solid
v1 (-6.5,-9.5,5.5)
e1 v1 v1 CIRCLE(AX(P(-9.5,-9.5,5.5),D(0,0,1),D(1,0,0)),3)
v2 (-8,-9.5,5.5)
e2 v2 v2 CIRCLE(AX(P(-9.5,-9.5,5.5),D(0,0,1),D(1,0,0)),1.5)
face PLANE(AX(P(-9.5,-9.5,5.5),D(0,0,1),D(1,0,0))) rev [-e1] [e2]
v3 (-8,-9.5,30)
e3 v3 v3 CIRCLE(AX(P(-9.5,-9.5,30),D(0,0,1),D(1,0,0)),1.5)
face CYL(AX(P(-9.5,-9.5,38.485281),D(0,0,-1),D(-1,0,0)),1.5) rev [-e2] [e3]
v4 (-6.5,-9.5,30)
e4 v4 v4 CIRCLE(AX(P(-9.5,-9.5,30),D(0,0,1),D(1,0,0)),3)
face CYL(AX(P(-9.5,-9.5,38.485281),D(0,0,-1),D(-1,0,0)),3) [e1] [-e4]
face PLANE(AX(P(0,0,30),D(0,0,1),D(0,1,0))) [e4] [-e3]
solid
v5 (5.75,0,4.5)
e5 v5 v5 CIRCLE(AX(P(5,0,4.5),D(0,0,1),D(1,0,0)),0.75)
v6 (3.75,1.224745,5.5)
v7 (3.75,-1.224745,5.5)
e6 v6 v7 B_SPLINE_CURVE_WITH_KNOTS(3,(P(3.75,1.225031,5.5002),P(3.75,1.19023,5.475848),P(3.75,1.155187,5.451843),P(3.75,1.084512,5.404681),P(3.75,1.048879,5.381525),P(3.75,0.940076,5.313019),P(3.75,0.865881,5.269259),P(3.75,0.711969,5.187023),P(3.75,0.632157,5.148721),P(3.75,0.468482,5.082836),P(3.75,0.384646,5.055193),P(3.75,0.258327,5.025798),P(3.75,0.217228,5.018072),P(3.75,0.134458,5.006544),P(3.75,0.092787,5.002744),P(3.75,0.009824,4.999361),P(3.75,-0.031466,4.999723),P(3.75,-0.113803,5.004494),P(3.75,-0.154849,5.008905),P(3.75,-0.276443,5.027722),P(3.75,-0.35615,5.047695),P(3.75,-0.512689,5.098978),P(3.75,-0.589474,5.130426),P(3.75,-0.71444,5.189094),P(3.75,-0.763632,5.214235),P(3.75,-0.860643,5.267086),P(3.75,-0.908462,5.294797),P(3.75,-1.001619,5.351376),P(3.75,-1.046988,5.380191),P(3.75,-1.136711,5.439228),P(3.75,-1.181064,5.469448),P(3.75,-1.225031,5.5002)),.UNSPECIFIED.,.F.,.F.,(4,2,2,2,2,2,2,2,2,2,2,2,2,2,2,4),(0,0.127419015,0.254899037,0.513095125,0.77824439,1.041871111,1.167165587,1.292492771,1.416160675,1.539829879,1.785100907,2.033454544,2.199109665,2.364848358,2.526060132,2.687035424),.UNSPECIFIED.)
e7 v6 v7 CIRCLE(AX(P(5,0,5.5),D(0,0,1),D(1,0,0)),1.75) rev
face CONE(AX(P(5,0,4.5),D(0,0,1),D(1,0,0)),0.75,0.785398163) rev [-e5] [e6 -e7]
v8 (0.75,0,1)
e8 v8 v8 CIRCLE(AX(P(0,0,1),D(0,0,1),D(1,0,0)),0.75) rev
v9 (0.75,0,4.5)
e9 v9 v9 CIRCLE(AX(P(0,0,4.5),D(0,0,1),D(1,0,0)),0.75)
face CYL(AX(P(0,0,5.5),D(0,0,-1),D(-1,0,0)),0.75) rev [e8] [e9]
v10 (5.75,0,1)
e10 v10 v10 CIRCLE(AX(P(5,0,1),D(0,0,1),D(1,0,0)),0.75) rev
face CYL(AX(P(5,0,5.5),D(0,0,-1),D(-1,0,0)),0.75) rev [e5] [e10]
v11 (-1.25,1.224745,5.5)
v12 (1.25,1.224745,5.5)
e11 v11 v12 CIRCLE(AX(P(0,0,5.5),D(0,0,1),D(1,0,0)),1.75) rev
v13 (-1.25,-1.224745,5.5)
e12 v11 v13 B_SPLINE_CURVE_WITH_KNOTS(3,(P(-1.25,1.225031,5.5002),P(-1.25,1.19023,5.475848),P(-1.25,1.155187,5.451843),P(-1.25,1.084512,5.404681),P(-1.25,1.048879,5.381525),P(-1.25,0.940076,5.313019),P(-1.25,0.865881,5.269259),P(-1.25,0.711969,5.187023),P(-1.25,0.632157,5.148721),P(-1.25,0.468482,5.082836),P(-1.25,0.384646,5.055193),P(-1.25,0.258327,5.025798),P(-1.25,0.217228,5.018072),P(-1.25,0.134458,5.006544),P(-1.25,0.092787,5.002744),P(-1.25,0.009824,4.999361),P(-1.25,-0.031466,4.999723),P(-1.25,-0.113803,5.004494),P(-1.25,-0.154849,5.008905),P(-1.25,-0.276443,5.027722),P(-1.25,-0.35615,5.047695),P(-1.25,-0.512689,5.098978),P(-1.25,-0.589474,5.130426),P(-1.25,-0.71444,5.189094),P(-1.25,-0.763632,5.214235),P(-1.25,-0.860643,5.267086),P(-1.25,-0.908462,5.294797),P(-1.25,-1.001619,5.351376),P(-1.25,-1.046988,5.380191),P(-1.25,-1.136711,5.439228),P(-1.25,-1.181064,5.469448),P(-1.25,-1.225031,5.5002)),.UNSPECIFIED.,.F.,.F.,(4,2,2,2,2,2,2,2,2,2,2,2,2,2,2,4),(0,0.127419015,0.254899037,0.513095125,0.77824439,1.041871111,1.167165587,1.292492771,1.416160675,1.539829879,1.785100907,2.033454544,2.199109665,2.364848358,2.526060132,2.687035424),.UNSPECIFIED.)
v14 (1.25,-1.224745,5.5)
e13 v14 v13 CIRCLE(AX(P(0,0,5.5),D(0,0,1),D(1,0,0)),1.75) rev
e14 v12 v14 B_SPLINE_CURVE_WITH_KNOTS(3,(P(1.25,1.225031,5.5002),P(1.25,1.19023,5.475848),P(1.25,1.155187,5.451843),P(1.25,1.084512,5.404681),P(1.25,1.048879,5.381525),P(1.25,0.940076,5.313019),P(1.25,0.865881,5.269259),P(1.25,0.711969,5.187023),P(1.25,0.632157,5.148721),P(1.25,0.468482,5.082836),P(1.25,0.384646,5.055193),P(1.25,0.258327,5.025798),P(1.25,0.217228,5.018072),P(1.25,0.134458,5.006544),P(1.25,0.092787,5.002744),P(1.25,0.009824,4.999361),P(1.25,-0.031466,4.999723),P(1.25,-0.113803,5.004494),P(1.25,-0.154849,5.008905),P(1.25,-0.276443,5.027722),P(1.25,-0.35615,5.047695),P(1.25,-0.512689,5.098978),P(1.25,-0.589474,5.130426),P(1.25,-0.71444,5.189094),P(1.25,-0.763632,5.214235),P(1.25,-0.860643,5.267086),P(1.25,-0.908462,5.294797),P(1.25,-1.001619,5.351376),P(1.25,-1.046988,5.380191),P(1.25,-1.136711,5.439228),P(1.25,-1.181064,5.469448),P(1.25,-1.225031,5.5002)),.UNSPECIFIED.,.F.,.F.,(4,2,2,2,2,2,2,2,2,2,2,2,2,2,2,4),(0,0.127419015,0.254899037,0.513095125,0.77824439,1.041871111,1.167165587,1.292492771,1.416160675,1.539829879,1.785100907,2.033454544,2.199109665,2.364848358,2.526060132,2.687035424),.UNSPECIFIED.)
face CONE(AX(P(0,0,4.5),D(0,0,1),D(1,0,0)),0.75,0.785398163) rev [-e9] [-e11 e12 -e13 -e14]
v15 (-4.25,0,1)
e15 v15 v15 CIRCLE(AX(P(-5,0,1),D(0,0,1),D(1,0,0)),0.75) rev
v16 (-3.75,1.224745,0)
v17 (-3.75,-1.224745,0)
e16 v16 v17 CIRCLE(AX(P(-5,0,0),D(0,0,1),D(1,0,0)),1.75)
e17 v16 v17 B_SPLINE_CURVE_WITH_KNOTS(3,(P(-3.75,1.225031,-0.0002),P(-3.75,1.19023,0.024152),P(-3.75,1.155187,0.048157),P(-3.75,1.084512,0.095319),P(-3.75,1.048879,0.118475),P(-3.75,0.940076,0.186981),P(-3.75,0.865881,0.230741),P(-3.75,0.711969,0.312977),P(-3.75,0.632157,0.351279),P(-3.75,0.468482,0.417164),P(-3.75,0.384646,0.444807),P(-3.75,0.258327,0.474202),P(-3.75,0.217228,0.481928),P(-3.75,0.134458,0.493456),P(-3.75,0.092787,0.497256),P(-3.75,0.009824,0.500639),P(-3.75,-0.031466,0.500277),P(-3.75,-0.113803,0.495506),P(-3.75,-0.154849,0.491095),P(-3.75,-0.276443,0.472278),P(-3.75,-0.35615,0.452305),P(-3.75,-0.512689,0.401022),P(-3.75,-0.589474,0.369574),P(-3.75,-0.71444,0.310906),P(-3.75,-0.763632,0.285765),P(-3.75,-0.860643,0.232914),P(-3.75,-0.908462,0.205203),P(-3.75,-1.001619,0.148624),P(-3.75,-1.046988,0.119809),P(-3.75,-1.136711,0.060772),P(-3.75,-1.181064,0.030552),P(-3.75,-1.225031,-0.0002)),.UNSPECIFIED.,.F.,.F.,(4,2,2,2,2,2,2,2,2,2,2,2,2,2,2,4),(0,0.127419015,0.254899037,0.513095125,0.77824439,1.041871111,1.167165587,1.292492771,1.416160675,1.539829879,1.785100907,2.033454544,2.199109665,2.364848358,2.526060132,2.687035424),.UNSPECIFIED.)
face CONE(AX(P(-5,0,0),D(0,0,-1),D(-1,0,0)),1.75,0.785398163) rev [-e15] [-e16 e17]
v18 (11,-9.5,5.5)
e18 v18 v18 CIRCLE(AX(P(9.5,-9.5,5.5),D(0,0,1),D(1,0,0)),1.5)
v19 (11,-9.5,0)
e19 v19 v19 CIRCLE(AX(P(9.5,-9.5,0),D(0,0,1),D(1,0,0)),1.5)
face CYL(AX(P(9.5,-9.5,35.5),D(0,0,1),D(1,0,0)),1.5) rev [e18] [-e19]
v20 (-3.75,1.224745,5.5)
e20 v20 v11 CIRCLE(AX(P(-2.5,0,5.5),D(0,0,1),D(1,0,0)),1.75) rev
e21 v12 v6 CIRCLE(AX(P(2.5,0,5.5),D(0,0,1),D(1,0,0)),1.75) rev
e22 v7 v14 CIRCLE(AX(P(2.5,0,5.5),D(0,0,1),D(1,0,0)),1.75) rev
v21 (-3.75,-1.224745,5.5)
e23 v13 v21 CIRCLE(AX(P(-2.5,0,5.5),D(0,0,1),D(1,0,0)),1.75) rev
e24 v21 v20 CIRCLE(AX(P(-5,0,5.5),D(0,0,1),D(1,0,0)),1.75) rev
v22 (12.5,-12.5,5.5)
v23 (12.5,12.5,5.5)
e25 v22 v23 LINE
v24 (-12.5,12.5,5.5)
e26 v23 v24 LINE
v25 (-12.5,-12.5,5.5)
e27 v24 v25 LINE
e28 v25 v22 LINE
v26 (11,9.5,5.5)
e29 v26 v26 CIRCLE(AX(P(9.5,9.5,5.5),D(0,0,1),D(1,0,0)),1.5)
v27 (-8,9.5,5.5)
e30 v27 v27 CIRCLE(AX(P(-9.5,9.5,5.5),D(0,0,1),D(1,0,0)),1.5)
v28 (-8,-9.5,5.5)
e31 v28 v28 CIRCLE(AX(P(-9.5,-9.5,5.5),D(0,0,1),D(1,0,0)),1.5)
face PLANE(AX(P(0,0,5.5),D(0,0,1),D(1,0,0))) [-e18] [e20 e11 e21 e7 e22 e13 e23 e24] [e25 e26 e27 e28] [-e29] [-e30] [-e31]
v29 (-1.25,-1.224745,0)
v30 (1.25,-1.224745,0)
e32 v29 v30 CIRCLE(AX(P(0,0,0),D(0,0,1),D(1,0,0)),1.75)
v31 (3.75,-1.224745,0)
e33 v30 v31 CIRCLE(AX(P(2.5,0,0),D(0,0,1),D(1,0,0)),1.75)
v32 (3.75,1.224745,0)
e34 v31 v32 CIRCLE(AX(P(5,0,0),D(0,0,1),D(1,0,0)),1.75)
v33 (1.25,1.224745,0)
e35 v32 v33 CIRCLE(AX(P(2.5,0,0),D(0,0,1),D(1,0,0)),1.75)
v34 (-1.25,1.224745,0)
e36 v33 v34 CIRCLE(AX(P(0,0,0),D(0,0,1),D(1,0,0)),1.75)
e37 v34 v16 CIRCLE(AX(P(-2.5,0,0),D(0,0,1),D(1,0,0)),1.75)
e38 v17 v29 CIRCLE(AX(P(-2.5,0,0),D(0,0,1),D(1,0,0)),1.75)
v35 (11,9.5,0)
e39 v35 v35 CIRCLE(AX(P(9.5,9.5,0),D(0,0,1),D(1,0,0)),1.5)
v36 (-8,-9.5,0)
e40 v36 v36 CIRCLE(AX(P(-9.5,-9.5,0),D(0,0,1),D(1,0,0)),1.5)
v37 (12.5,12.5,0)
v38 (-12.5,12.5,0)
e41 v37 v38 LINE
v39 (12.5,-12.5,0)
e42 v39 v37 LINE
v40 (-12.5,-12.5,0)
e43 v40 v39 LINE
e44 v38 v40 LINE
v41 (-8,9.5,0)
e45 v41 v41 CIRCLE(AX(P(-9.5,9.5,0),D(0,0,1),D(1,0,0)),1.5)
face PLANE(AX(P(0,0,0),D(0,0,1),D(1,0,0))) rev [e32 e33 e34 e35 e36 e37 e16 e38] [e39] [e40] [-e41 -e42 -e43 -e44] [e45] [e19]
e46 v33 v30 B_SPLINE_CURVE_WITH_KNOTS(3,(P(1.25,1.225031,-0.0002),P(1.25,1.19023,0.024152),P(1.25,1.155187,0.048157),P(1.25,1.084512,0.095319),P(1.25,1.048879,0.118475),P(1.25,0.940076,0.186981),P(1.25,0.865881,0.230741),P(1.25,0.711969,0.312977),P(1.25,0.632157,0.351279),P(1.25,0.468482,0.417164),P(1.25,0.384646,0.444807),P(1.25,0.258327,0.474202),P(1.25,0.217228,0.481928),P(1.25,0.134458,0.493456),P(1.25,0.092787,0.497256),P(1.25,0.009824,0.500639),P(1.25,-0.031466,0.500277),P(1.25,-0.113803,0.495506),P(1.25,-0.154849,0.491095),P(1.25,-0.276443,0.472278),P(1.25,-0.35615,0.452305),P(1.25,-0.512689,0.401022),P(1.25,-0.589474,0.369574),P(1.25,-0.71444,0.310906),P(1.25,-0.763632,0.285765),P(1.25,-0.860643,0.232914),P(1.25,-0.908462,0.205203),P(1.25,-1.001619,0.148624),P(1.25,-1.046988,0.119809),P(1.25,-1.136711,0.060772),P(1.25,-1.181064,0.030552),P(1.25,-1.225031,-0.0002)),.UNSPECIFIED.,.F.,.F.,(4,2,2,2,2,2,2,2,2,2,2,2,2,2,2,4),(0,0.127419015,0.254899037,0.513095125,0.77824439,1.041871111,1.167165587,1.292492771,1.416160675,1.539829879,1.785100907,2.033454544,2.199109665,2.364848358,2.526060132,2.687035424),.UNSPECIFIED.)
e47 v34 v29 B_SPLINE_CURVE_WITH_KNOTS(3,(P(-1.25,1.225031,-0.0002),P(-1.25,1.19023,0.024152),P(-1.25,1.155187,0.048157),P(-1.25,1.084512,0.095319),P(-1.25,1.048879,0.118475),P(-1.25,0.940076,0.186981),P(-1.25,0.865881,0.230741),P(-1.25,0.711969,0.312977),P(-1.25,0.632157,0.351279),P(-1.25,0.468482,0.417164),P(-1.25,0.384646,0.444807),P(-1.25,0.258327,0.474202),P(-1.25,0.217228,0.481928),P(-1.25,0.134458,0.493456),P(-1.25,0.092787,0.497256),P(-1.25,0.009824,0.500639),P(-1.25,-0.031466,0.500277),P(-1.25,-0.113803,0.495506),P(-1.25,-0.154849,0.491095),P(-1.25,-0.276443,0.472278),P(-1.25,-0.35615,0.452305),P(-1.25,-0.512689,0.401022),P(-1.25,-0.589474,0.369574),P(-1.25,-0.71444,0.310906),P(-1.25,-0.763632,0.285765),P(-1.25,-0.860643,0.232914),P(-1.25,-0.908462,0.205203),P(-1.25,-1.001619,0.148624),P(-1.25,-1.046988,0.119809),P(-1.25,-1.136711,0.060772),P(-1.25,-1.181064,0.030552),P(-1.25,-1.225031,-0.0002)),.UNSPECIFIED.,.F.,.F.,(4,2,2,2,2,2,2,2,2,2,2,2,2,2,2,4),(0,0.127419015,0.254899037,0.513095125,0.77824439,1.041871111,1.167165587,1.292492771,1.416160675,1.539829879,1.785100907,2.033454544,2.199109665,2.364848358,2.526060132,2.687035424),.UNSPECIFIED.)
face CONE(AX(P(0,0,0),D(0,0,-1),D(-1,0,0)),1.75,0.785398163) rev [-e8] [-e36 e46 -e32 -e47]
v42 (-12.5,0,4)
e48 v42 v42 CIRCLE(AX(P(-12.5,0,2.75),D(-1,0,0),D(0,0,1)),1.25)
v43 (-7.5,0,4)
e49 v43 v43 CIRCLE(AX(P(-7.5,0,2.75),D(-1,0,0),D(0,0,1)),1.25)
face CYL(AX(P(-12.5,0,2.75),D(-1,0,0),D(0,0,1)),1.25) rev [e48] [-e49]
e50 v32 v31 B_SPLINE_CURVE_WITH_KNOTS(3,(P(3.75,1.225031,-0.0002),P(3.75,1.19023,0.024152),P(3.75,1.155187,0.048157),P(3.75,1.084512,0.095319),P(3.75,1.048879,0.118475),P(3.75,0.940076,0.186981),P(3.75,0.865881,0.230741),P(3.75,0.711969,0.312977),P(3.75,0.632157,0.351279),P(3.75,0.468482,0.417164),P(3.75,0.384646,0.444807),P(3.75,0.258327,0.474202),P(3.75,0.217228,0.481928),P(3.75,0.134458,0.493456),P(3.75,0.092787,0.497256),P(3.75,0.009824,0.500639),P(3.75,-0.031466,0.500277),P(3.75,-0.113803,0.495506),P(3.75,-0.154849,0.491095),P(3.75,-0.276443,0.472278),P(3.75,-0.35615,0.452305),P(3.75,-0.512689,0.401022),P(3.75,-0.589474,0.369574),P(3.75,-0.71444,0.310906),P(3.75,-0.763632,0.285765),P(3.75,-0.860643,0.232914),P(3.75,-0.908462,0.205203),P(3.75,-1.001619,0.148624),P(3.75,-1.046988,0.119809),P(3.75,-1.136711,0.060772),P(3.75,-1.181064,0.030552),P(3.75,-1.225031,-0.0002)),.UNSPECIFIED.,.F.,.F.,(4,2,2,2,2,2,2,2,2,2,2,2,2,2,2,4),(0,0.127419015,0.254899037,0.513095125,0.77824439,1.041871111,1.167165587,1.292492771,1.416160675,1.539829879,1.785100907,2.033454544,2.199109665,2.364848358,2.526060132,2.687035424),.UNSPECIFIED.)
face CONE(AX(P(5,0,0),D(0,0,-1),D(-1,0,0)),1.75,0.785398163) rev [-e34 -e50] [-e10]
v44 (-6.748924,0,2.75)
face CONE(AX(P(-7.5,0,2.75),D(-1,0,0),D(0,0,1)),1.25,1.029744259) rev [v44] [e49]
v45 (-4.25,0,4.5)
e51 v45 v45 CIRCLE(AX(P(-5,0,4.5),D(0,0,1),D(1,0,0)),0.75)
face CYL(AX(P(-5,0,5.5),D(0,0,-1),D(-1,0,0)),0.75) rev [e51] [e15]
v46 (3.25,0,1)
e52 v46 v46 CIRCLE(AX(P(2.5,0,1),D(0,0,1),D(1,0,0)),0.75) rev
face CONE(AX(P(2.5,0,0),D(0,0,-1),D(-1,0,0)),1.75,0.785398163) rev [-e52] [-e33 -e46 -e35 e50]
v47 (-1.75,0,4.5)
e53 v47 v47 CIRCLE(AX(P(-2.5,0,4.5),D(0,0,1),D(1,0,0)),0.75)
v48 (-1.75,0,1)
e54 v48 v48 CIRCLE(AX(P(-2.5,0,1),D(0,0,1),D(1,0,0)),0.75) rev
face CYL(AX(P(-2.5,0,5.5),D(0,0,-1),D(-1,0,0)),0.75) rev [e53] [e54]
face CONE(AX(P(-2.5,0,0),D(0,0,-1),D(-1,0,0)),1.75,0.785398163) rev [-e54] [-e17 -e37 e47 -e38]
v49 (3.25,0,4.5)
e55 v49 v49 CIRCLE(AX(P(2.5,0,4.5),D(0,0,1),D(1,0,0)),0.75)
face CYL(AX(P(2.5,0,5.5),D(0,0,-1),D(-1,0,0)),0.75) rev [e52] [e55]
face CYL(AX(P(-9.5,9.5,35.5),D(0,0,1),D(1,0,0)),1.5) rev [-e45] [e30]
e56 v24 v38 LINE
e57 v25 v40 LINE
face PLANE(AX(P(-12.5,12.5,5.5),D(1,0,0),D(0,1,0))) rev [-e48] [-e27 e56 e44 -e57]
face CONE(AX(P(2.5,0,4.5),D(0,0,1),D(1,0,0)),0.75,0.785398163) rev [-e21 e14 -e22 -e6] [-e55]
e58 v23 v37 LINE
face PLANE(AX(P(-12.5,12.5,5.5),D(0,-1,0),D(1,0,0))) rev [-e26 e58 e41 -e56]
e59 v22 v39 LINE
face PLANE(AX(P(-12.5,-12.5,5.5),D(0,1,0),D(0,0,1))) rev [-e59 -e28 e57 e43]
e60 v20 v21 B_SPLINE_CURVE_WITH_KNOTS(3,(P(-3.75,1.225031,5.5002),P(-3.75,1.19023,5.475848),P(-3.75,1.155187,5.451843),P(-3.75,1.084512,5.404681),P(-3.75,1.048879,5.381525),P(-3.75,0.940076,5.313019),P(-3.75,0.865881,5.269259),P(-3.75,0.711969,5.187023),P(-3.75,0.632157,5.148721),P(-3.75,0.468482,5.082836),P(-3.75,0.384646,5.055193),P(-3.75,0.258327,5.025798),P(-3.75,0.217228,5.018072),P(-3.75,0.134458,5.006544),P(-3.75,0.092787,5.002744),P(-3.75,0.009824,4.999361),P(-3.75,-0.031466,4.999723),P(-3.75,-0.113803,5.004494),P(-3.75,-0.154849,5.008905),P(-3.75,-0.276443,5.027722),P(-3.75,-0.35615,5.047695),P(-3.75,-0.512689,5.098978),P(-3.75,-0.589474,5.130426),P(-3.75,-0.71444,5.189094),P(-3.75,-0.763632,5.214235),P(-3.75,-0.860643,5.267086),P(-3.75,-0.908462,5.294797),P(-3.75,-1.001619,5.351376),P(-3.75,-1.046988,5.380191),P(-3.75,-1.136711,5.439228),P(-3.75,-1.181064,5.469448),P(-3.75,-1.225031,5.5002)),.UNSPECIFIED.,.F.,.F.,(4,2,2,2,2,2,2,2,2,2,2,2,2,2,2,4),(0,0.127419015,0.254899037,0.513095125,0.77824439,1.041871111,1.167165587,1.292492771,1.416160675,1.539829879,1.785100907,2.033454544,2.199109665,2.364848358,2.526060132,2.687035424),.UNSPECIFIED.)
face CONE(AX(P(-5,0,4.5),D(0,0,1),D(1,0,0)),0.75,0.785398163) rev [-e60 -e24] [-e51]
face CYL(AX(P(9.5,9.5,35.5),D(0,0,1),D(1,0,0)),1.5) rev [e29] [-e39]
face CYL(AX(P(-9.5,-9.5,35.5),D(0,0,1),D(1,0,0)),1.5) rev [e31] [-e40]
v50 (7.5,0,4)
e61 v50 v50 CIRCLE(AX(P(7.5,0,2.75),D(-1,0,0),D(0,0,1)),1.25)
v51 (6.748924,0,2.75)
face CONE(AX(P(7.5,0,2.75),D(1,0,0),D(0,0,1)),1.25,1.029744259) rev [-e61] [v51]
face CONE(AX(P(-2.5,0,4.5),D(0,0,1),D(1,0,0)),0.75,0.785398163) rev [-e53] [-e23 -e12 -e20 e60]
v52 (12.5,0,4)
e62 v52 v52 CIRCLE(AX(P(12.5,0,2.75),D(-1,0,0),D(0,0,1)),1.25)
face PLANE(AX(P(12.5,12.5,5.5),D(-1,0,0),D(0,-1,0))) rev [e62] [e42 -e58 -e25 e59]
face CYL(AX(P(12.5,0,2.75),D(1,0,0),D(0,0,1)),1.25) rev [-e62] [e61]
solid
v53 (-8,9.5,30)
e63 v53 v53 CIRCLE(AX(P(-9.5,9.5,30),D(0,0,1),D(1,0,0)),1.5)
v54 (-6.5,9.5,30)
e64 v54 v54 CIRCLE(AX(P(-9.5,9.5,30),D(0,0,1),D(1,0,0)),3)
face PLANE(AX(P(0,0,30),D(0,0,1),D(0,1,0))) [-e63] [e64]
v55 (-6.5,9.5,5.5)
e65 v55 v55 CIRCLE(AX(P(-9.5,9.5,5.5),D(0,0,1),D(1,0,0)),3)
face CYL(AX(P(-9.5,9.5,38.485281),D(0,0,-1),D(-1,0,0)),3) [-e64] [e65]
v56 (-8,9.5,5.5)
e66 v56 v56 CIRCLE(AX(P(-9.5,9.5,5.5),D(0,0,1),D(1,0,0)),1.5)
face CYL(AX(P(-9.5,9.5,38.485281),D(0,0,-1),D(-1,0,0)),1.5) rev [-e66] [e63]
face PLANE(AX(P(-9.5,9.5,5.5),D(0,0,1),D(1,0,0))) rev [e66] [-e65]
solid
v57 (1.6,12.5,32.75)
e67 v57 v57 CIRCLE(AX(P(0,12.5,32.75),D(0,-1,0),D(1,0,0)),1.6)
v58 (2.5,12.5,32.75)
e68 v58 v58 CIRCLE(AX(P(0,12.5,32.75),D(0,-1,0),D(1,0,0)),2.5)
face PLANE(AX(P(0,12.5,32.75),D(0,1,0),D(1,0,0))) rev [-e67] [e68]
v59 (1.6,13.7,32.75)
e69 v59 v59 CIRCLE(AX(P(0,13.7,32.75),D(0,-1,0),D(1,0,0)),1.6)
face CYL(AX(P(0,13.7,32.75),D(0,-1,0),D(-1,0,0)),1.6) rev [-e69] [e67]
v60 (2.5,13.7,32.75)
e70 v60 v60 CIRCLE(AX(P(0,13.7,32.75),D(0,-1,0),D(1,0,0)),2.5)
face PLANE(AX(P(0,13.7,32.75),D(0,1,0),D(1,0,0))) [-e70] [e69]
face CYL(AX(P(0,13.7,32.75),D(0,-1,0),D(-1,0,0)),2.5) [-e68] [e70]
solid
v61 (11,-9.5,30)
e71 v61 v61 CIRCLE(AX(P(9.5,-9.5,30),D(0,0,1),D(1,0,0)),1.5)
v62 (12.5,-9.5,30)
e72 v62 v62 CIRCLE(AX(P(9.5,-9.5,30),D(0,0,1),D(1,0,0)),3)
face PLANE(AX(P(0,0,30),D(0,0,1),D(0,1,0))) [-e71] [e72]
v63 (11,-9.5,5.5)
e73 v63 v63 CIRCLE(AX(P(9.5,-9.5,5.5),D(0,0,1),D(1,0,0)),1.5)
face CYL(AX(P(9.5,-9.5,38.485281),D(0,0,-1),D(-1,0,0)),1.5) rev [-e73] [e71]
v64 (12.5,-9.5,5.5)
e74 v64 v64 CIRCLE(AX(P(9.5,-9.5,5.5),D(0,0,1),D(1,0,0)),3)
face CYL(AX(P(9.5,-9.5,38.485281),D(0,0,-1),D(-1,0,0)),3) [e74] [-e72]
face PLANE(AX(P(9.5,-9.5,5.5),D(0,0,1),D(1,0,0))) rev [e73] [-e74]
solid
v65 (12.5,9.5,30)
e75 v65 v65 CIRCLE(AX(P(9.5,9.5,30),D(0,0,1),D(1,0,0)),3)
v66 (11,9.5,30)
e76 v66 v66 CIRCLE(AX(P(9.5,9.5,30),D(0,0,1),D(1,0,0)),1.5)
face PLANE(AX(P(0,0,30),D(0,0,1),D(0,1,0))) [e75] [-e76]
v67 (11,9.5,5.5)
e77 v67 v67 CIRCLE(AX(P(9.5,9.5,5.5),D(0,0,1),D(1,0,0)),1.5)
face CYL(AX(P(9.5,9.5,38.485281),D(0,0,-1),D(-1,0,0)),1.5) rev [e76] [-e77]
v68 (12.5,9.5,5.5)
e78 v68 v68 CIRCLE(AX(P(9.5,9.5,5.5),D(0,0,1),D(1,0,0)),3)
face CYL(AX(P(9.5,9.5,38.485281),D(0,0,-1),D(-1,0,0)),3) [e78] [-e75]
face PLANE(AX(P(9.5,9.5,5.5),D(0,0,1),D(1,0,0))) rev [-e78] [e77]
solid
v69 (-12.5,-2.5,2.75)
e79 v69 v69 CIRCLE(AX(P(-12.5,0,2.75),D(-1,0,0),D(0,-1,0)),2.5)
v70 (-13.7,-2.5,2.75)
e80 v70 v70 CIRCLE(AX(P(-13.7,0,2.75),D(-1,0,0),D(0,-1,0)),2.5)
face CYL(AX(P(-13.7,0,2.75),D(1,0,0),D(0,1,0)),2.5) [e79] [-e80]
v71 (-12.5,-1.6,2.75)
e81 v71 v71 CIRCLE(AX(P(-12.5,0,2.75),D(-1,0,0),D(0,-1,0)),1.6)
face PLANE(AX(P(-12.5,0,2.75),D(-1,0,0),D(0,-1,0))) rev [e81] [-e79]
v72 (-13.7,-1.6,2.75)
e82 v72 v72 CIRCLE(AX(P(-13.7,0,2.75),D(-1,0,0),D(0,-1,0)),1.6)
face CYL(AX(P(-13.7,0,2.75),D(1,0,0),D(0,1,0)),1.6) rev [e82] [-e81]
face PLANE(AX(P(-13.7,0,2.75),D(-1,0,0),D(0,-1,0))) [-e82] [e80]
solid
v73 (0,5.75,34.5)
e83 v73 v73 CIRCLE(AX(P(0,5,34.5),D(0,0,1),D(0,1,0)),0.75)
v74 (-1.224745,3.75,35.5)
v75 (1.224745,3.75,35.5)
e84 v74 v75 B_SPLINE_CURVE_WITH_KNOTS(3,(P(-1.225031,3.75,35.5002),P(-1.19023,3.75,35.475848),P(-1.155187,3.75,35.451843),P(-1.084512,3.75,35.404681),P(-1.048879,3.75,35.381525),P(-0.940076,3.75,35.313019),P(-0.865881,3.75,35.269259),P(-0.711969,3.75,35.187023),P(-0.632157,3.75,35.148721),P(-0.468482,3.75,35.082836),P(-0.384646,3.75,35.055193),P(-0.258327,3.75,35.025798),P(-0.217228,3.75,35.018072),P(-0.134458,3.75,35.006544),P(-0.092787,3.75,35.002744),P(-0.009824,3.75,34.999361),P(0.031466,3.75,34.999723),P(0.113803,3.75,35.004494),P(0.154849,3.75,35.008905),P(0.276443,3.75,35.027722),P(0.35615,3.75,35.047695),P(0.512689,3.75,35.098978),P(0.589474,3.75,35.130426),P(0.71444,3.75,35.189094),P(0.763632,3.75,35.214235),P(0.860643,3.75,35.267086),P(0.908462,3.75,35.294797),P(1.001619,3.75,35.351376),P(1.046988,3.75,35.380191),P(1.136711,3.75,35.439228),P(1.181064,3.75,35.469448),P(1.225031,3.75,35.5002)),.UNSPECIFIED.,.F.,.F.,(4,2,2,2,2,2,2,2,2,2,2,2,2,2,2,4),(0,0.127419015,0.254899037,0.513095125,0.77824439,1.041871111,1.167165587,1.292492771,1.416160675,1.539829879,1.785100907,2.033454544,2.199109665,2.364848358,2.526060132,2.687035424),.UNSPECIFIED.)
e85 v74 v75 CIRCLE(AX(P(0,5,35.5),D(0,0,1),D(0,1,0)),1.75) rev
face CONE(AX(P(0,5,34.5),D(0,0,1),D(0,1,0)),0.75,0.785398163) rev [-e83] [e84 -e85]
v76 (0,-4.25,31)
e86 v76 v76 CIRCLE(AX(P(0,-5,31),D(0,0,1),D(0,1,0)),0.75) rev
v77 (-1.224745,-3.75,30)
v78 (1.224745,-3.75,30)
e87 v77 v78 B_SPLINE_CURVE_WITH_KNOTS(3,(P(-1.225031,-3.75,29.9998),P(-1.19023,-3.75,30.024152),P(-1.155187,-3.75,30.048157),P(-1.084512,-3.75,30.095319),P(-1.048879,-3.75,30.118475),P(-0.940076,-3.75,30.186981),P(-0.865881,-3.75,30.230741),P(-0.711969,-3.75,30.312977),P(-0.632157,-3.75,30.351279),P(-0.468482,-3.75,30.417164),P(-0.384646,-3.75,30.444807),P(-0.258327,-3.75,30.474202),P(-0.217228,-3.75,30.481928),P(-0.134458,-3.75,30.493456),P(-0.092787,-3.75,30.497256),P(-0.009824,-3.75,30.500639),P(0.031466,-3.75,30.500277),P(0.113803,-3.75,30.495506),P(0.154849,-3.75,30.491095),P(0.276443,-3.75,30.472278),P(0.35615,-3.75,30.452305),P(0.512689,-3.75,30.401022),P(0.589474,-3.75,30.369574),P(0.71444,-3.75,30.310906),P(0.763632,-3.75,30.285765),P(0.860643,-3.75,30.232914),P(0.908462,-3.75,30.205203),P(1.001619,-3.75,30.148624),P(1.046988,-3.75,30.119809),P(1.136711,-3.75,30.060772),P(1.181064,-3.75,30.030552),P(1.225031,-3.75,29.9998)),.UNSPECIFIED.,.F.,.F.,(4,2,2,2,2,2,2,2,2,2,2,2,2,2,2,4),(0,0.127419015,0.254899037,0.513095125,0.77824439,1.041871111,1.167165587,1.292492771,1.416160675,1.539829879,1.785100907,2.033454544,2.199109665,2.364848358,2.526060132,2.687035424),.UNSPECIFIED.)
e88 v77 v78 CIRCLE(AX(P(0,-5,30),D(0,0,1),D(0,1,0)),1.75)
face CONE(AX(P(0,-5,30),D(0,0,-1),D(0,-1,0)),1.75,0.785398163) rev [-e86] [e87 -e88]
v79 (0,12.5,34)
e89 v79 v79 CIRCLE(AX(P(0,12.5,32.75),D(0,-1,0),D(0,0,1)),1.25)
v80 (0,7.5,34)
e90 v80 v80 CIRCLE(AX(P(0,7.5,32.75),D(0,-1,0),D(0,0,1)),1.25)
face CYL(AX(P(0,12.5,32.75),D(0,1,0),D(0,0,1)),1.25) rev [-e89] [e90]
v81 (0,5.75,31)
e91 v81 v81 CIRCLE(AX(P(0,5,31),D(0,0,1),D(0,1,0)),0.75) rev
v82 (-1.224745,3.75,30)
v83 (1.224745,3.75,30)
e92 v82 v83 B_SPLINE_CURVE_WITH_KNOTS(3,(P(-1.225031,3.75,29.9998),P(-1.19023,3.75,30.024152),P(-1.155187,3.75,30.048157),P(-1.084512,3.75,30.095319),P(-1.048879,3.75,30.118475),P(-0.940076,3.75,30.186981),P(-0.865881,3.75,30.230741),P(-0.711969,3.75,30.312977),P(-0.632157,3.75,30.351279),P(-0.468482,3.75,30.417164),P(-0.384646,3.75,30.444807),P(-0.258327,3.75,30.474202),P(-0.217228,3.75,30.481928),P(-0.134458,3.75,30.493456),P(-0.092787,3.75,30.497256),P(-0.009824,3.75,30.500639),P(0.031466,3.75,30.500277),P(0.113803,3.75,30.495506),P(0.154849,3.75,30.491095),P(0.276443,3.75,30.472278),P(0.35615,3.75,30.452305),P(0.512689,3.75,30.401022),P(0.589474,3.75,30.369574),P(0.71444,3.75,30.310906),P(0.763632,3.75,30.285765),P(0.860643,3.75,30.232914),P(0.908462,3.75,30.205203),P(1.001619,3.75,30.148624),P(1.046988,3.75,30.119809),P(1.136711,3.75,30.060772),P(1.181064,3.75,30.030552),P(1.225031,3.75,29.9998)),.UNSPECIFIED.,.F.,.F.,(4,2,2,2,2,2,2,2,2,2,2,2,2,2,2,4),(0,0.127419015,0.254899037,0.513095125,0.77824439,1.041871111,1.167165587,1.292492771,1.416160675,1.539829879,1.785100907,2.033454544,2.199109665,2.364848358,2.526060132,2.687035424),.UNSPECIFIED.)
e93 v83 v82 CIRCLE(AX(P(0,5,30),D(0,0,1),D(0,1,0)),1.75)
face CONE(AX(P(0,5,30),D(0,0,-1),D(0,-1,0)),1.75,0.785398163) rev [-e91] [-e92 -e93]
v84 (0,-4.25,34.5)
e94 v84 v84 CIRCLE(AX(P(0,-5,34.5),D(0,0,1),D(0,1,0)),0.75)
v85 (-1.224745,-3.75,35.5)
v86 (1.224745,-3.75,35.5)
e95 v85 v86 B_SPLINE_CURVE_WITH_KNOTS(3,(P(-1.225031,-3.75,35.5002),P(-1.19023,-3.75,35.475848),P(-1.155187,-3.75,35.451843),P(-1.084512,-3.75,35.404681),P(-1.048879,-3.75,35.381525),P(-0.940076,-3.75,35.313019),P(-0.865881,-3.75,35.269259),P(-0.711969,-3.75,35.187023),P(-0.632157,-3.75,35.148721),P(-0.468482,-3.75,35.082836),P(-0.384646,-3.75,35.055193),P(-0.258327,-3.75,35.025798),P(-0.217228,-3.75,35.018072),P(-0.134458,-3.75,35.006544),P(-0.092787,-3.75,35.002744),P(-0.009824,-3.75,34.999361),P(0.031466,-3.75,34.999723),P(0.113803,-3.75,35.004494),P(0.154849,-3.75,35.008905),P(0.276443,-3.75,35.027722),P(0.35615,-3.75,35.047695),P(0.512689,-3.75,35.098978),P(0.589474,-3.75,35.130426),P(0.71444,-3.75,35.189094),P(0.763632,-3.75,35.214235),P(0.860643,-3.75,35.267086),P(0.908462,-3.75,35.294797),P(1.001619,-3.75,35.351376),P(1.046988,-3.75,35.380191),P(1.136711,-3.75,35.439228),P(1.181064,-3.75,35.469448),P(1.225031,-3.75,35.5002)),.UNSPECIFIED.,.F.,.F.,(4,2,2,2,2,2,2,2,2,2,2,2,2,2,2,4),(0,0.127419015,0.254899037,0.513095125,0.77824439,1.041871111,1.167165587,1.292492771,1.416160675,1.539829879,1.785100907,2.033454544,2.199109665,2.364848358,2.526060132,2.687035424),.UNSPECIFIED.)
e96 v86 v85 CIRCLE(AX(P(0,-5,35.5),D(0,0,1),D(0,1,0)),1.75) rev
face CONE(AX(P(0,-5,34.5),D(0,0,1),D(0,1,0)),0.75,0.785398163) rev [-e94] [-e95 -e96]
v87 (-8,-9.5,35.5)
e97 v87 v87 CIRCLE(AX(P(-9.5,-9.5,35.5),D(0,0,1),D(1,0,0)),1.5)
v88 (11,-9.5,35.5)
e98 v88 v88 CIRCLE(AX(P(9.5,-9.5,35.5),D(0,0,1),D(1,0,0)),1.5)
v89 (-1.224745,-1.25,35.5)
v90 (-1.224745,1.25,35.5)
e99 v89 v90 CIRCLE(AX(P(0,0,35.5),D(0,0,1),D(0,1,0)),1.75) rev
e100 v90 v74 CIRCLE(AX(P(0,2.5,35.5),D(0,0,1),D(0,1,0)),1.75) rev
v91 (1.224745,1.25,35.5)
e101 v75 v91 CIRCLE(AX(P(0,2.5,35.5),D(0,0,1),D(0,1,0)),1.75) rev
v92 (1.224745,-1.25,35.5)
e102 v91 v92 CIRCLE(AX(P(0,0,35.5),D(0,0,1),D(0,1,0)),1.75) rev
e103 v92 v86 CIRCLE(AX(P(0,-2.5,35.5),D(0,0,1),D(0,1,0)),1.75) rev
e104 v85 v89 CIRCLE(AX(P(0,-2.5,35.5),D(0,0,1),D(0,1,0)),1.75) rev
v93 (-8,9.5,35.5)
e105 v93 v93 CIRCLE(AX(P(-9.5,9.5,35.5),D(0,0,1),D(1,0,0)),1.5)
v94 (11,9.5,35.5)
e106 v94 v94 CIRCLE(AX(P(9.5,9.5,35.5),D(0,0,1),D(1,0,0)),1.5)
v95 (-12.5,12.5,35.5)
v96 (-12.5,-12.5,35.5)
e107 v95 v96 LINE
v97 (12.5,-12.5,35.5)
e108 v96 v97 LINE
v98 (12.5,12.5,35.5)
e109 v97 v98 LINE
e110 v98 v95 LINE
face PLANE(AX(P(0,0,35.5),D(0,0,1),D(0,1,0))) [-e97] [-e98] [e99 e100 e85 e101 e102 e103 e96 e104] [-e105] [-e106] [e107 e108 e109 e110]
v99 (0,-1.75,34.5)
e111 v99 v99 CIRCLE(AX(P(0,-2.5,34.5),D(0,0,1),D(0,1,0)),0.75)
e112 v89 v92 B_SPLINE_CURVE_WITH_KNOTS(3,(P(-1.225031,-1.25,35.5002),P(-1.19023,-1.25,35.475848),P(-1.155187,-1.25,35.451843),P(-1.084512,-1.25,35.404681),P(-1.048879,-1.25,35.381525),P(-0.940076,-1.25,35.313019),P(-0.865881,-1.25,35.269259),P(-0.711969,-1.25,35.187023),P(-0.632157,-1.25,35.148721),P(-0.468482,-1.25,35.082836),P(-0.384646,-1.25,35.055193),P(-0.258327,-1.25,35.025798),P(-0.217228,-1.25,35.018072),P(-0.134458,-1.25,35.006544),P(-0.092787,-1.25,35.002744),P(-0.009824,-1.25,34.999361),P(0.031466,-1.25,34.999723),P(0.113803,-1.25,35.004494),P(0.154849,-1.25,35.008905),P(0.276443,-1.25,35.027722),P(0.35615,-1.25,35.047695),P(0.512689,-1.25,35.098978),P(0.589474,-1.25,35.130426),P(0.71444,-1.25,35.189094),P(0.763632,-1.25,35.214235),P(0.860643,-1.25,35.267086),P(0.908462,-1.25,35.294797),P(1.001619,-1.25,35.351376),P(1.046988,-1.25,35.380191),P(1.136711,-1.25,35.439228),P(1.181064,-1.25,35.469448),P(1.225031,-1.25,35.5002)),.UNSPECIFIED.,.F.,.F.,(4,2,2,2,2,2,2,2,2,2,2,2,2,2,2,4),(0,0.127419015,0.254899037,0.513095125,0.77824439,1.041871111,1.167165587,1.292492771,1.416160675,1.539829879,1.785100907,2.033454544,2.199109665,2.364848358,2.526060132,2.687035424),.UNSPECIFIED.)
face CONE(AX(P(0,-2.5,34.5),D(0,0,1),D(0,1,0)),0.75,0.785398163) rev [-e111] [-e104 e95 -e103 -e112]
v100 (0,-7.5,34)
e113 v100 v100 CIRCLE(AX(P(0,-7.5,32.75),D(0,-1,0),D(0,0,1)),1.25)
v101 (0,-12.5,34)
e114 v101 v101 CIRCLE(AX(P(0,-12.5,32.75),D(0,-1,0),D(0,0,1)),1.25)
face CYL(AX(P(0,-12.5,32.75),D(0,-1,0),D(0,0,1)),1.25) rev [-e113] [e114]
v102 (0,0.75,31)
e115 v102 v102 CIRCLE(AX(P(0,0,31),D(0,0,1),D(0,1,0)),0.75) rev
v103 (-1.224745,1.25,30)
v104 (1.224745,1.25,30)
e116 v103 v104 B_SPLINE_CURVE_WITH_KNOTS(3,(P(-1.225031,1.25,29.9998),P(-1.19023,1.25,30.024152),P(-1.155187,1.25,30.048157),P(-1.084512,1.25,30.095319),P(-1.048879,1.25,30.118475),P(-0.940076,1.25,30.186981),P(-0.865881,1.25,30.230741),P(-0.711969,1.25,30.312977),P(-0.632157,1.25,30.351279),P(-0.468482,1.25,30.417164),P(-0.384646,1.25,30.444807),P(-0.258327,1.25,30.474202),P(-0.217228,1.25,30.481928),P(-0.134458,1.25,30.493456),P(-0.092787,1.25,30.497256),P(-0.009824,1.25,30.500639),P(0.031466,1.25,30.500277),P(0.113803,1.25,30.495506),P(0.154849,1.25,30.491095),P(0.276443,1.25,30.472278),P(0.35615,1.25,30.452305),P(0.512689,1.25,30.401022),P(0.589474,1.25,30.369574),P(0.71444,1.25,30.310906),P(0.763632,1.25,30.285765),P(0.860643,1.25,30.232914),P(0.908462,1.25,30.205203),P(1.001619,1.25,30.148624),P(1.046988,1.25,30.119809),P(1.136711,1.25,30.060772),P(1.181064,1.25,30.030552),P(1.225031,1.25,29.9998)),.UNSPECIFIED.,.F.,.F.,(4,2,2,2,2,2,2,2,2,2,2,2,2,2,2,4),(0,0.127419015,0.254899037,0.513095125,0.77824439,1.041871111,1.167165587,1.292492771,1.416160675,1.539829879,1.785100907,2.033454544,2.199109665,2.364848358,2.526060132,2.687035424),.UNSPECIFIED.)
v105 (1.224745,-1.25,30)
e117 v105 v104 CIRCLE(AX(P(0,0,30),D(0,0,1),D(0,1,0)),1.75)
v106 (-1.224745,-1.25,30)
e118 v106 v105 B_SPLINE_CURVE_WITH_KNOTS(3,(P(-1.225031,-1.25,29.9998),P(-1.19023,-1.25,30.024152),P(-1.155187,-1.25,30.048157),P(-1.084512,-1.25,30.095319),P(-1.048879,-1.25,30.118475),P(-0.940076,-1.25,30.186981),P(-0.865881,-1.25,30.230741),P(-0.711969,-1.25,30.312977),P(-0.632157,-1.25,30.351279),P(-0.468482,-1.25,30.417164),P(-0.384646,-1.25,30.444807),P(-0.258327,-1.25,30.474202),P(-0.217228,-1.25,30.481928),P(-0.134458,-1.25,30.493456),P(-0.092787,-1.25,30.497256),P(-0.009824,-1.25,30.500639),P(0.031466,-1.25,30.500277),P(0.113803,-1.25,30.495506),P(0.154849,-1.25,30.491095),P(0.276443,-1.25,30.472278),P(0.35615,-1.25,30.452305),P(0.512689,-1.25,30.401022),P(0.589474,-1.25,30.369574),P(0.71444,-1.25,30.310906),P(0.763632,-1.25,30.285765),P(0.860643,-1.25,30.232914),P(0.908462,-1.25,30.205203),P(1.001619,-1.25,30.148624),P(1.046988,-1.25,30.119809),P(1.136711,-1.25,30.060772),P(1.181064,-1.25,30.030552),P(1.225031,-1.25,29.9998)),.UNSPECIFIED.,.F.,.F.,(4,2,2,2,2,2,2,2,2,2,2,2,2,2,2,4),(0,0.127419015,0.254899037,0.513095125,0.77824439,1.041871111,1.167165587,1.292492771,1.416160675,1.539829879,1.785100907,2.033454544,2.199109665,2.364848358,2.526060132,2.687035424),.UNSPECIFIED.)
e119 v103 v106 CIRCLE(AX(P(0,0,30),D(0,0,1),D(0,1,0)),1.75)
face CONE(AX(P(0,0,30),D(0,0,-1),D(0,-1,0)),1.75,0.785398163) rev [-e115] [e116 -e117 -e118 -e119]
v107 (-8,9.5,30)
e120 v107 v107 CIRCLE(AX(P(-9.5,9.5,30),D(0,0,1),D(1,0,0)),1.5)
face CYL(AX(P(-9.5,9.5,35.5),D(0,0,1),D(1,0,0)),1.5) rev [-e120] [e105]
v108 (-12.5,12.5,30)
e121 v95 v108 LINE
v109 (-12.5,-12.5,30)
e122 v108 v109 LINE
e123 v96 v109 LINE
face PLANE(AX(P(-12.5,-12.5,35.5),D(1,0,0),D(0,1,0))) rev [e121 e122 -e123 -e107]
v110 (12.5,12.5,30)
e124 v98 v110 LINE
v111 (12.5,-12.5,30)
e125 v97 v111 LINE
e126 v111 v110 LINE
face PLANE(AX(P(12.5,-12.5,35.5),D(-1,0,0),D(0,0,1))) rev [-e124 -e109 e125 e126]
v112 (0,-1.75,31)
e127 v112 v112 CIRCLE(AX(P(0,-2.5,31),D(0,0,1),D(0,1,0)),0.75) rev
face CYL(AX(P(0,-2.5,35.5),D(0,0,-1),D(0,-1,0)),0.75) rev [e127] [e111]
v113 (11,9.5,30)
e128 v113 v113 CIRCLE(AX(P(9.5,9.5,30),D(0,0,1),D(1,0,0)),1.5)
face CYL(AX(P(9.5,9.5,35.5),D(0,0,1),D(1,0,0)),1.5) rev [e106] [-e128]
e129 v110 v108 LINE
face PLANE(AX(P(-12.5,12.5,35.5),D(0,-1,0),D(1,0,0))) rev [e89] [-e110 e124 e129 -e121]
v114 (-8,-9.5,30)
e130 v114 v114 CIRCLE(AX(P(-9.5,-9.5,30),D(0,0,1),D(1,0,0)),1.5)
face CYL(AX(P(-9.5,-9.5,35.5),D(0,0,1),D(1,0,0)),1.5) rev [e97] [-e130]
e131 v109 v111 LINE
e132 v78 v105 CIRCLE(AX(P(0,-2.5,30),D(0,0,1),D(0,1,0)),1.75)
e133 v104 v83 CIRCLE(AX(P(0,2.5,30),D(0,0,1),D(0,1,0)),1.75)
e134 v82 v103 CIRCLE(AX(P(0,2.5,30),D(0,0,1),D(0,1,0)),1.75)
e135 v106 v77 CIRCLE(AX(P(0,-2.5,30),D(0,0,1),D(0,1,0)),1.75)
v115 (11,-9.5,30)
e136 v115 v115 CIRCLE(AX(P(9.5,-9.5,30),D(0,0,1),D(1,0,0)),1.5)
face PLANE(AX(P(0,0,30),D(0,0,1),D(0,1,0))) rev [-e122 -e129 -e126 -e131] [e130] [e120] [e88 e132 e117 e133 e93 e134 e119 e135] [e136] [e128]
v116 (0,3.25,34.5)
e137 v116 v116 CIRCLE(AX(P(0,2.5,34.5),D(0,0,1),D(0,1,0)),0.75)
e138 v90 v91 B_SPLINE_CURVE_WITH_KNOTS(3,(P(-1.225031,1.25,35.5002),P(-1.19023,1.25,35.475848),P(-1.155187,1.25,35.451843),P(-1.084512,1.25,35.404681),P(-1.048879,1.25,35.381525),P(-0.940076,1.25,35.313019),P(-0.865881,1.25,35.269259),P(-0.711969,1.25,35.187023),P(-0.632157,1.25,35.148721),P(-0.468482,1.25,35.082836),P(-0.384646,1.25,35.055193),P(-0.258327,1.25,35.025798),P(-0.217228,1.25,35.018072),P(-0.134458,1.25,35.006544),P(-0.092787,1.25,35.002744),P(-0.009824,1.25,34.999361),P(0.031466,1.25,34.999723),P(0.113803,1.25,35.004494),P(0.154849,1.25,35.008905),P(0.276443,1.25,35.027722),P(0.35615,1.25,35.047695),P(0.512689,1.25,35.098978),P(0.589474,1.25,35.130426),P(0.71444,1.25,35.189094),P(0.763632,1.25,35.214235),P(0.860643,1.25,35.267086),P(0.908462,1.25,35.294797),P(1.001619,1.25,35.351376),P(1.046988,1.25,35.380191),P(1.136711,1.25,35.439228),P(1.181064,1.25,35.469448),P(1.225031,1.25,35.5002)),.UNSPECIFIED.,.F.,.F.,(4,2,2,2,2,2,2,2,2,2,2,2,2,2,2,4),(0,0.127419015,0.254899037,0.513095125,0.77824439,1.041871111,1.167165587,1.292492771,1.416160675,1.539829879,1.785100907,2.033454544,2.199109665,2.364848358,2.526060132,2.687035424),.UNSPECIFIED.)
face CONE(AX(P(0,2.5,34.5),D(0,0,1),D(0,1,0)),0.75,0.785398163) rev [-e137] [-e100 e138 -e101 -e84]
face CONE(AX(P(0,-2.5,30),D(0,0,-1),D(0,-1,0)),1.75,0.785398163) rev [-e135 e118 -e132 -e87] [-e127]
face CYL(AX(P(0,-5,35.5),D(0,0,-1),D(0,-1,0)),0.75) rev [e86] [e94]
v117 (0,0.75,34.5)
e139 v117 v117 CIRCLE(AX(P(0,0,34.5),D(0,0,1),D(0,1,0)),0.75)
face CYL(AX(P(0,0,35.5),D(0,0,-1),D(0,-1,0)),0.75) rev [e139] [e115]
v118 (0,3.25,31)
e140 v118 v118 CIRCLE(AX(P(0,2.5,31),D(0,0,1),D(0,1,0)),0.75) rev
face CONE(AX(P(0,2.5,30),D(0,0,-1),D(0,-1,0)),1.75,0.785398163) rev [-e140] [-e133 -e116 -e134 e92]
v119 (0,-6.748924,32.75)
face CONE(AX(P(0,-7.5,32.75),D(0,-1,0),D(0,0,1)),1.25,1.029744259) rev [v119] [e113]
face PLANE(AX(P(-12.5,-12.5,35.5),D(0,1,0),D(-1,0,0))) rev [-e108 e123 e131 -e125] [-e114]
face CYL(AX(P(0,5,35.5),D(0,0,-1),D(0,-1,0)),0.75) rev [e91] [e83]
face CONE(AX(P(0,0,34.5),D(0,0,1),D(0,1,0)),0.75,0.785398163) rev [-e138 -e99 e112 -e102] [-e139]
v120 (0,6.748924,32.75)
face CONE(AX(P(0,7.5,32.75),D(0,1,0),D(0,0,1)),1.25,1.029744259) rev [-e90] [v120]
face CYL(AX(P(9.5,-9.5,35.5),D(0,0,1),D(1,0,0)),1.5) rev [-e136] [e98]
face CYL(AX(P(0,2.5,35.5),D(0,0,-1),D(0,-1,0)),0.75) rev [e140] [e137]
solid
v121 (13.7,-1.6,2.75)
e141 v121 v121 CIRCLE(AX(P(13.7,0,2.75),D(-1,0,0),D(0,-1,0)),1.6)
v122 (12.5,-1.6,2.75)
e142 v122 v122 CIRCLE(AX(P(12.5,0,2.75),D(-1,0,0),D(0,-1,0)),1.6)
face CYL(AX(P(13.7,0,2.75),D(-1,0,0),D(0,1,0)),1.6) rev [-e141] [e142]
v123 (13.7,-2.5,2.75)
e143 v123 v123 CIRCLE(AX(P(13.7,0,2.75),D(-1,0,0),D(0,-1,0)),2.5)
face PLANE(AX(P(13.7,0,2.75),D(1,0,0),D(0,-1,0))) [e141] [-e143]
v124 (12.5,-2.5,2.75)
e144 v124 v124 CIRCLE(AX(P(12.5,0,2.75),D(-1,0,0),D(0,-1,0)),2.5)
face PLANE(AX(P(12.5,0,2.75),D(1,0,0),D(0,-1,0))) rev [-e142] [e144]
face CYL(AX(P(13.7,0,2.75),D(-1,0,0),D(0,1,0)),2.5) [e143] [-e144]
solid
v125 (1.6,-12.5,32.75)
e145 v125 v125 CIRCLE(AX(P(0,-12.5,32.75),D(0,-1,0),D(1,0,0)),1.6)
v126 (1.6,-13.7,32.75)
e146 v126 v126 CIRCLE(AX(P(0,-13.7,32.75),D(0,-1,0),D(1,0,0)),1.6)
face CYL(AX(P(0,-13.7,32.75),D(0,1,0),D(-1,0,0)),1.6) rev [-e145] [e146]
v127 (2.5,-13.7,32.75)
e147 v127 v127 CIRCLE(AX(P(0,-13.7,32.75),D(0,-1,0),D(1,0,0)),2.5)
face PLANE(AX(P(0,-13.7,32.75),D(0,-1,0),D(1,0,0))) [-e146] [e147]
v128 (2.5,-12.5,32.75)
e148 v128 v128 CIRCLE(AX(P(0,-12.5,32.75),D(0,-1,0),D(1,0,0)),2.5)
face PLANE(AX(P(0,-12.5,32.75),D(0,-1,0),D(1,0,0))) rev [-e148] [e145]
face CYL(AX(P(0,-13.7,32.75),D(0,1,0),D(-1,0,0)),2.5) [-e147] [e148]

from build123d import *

# Parameters (mm, degrees)
SKETCH_1_W                  = 25
SKETCH_1_H                  = 25
SKETCH_1_R                  = 0.75
EXTRUDE_1_DEPTH             = 5.5
SKETCH_17_R                 = 2.5
SKETCH_17_R_2               = 1.6
EXTRUDE_3_DEPTH             = 1.2
CHAMFER_1_SIZE              = 1
PATTERN_LINEAR_1_COUNT      = 2
PATTERN_LINEAR_1_PITCH      = 30
MOVE_BODY_1_ANGLE           = 90
SKETCH_3_W                  = 1.5
SKETCH_3_H                  = 35.742873133
HOLE_WIZARD_M3_1_AT_2_COUNT = 2
HOLE_WIZARD_M3_1_AT_2_PITCH = 19
HOLE_WIZARD_M3_1_AT_3_COUNT = 2
HOLE_WIZARD_M3_1_AT_3_PITCH = 26.870057685
HOLE_WIZARD_M3_1_AT_4_COUNT = 2
HOLE_WIZARD_M3_1_AT_4_PITCH = 19
SKETCH_4_R                  = 3
SKETCH_4_R_2                = 1.5
EXTRUDE_2_DEPTH             = 24.5
EXTRUDE_2_2_DEPTH           = 24.5
EXTRUDE_2_3_DEPTH           = 24.5
EXTRUDE_2_4_DEPTH           = 24.5


with BuildPart() as part:
    # ｽｹｯﾁ1 → ﾎﾞｽ - 押し出し1 (new body)
    with BuildSketch(Plane.XY):
        Rectangle(SKETCH_1_W, SKETCH_1_H)
        Circle(SKETCH_1_R, mode=Mode.SUBTRACT)
        with Locations((2.5, 0)):
            Circle(SKETCH_1_R, mode=Mode.SUBTRACT)
        with Locations((5, 0)):
            Circle(SKETCH_1_R, mode=Mode.SUBTRACT)
        with Locations(Location((-5, 0, 0), (0, 0, 180))):
            Circle(SKETCH_1_R, mode=Mode.SUBTRACT)
        with Locations(Location((-2.5, 0, 0), (0, 0, 180))):
            Circle(SKETCH_1_R, mode=Mode.SUBTRACT)
    extrude(amount=EXTRUDE_1_DEPTH)

    # ｽｹｯﾁ16 → M3x0.5 ねじ穴1 (revolve, cut)
    with BuildSketch(Plane(origin=(-12.5, 0, 2.75), x_dir=(0, 0, 1), z_dir=(0, 1, 0))):
        Polygon((0, 0), (0, 5.751075774), (1.25, 5), (1.25, 0), align=None)
    m3x0_5_1 = revolve(axis=Axis((-18.85, 0, 2.75), (1, 0, 0)), mode=Mode.SUBTRACT)

    # 面取り1
    # the kernel refuses this chamfer: 1 mm, written as the material it takes off along each edge
    with BuildSketch(Plane(origin=(0, 0, 0), x_dir=(1, 0, 0), z_dir=(0, -1, 0))) as chamfer_1_piece_1:
        Polygon((0.75 + CHAMFER_1_SIZE, 0), (0.75, CHAMFER_1_SIZE), (0.75, 0), align=None)
    revolve(axis=Axis((0, 0, 0), (0, 0, 1)), mode=Mode.SUBTRACT)
    with BuildSketch(Plane(origin=(0, 0, 5.5), x_dir=(1, 0, 0), z_dir=(0, -1, 0))) as chamfer_1_piece_2:
        Polygon((0.75 + CHAMFER_1_SIZE, 0), (0.75, -CHAMFER_1_SIZE), (0.75, 0), align=None)
    revolve(axis=Axis((0, 0, 5.5), (0, 0, 1)), mode=Mode.SUBTRACT)
    with BuildSketch(Plane(origin=(2.5, 0, 0), x_dir=(1, 0, 0), z_dir=(0, -1, 0))) as chamfer_1_piece_3:
        Polygon((0.75 + CHAMFER_1_SIZE, 0), (0.75, CHAMFER_1_SIZE), (0.75, 0), align=None)
    revolve(axis=Axis((2.5, 0, 0), (0, 0, 1)), mode=Mode.SUBTRACT)
    with BuildSketch(Plane(origin=(2.5, 0, 5.5), x_dir=(1, 0, 0), z_dir=(0, -1, 0))) as chamfer_1_piece_4:
        Polygon((0.75 + CHAMFER_1_SIZE, 0), (0.75, -CHAMFER_1_SIZE), (0.75, 0), align=None)
    revolve(axis=Axis((2.5, 0, 5.5), (0, 0, 1)), mode=Mode.SUBTRACT)
    with BuildSketch(Plane(origin=(5, 0, 0), x_dir=(1, 0, 0), z_dir=(0, -1, 0))) as chamfer_1_piece_5:
        Polygon((0.75 + CHAMFER_1_SIZE, 0), (0.75, CHAMFER_1_SIZE), (0.75, 0), align=None)
    revolve(axis=Axis((5, 0, 0), (0, 0, 1)), mode=Mode.SUBTRACT)
    with BuildSketch(Plane(origin=(5, 0, 5.5), x_dir=(1, 0, 0), z_dir=(0, -1, 0))) as chamfer_1_piece_6:
        Polygon((0.75 + CHAMFER_1_SIZE, 0), (0.75, -CHAMFER_1_SIZE), (0.75, 0), align=None)
    revolve(axis=Axis((5, 0, 5.5), (0, 0, 1)), mode=Mode.SUBTRACT)
    with BuildSketch(Plane(origin=(-5, 0, 0), x_dir=(-1, 0, 0), z_dir=(0, 1, 0))) as chamfer_1_piece_7:
        Polygon((0.75 + CHAMFER_1_SIZE, 0), (0.75, CHAMFER_1_SIZE), (0.75, 0), align=None)
    revolve(axis=Axis((-5, 0, 0), (0, 0, 1)), mode=Mode.SUBTRACT)
    with BuildSketch(Plane(origin=(-5, 0, 5.5), x_dir=(-1, 0, 0), z_dir=(0, 1, 0))) as chamfer_1_piece_8:
        Polygon((0.75 + CHAMFER_1_SIZE, 0), (0.75, -CHAMFER_1_SIZE), (0.75, 0), align=None)
    revolve(axis=Axis((-5, 0, 5.5), (0, 0, 1)), mode=Mode.SUBTRACT)
    with BuildSketch(Plane(origin=(-2.5, 0, 0), x_dir=(-1, 0, 0), z_dir=(0, 1, 0))) as chamfer_1_piece_9:
        Polygon((0.75 + CHAMFER_1_SIZE, 0), (0.75, CHAMFER_1_SIZE), (0.75, 0), align=None)
    revolve(axis=Axis((-2.5, 0, 0), (0, 0, 1)), mode=Mode.SUBTRACT)
    with BuildSketch(Plane(origin=(-2.5, 0, 5.5), x_dir=(-1, 0, 0), z_dir=(0, 1, 0))) as chamfer_1_piece_10:
        Polygon((0.75 + CHAMFER_1_SIZE, 0), (0.75, -CHAMFER_1_SIZE), (0.75, 0), align=None)
    revolve(axis=Axis((-2.5, 0, 5.5), (0, 0, 1)), mode=Mode.SUBTRACT)

    # ﾐﾗｰ1: M3x0.5 ねじ穴1 across plane
    add(m3x0_5_1.mirror(Plane(origin=(0, 0, 0), x_dir=(0, 0, 1), z_dir=(1, 0, 0))), mode=Mode.SUBTRACT)


with BuildPart() as body_2:
    # ｽｹｯﾁ17 → ﾎﾞｽ - 押し出し3 (new body)
    with BuildSketch(Plane.ZY.offset(12.5)):
        with Locations(Location((2.75, 0, 0), (0, 0, 270))):
            Circle(SKETCH_17_R)
        with Locations(Location((2.75, 0, 0), (0, 0, 270))):
            Circle(SKETCH_17_R_2, mode=Mode.SUBTRACT)
    extrude(amount=EXTRUDE_3_DEPTH)


with BuildPart() as body_3:
    # ﾐﾗｰ2: mirrored copy
    add(body_2.part.mirror(Plane(origin=(0, 0, 0), x_dir=(0, 0, 1), z_dir=(1, 0, 0))))


with BuildPart() as pattern_linear_1_1:
    # 直線ﾊﾟﾀｰﾝ1: pattern copy
    add(body_3.part.moved(Location(Vector(0, 0, 1) * (1 * PATTERN_LINEAR_1_PITCH))))


with BuildPart() as pattern_linear_1_2:
    # 直線ﾊﾟﾀｰﾝ1: pattern copy
    add(body_2.part.moved(Location(Vector(0, 0, 1) * (1 * PATTERN_LINEAR_1_PITCH))))


with BuildPart() as pattern_linear_1_3:
    # 直線ﾊﾟﾀｰﾝ1: pattern copy
    add(part.part.moved(Location(Vector(0, 0, 1) * (1 * PATTERN_LINEAR_1_PITCH))))


with BuildPart() as pattern_linear_1_3_1:
    # Move Body 1: moved
    add(pattern_linear_1_3.part.rotate(Axis((0, 0, 0), (0, 0, 1)), MOVE_BODY_1_ANGLE))


with BuildPart() as pattern_linear_1_1_1:
    # Move Body 1: moved
    add(pattern_linear_1_1.part.rotate(Axis((0, 0, 0), (0, 0, 1)), MOVE_BODY_1_ANGLE))


with BuildPart() as pattern_linear_1_2_1:
    # Move Body 1: moved
    add(pattern_linear_1_2.part.rotate(Axis((0, 0, 0), (0, 0, 1)), MOVE_BODY_1_ANGLE))


with BuildPart() as hole_wizard_m3_1_tool:
    # ｽｹｯﾁ3 → M3 すきま穴1 (revolve)
    with BuildSketch(Plane(origin=(9.5, 9.5, 35.5), x_dir=(0, -1, 0), z_dir=(1, 0, 0))):
        with Locations((0.75, 17.871436567)):
            Rectangle(SKETCH_3_W, SKETCH_3_H)
    hole_wizard_m3_1 = revolve(axis=Axis((9.5, 9.5, 41.85), (0, 0, -1)))


with BuildPart() as part_1:
    add(part.part)

    # M3 すきま穴1: cut by hole_wizard_m3_1_tool
    add(hole_wizard_m3_1_tool.part, mode=Mode.SUBTRACT)


with BuildPart() as pattern_linear_1_3_2:
    add(pattern_linear_1_3_1.part)

    # M3 すきま穴1: cut by hole_wizard_m3_1_tool
    add(hole_wizard_m3_1_tool.part, mode=Mode.SUBTRACT)


with BuildPart() as hole_wizard_m3_1_at_2_tool:
    # M3 すきま穴1 at 2: M3 すきま穴1 ×2
    with Locations(*[(0, -i * HOLE_WIZARD_M3_1_AT_2_PITCH, 0) for i in range(1, HOLE_WIZARD_M3_1_AT_2_COUNT)]):
        add(hole_wizard_m3_1)


with BuildPart() as part_2:
    add(part_1.part)

    # M3 すきま穴1 at 2: cut by hole_wizard_m3_1_at_2_tool
    add(hole_wizard_m3_1_at_2_tool.part, mode=Mode.SUBTRACT)


with BuildPart() as pattern_linear_1_3_3:
    add(pattern_linear_1_3_2.part)

    # M3 すきま穴1 at 2: cut by hole_wizard_m3_1_at_2_tool
    add(hole_wizard_m3_1_at_2_tool.part, mode=Mode.SUBTRACT)


with BuildPart() as hole_wizard_m3_1_at_3_tool:
    # M3 すきま穴1 at 3: M3 すきま穴1 ×2
    with Locations(*[Vector(-0.7071067811865502, -0.7071067811865449, 0) * (i * HOLE_WIZARD_M3_1_AT_3_PITCH) for i in range(1, HOLE_WIZARD_M3_1_AT_3_COUNT)]):
        add(hole_wizard_m3_1)


with BuildPart() as part_3:
    add(part_2.part)

    # M3 すきま穴1 at 3: cut by hole_wizard_m3_1_at_3_tool
    add(hole_wizard_m3_1_at_3_tool.part, mode=Mode.SUBTRACT)


with BuildPart() as pattern_linear_1_3_4:
    add(pattern_linear_1_3_3.part)

    # M3 すきま穴1 at 3: cut by hole_wizard_m3_1_at_3_tool
    add(hole_wizard_m3_1_at_3_tool.part, mode=Mode.SUBTRACT)


with BuildPart() as hole_wizard_m3_1_at_4_tool:
    # M3 すきま穴1 at 4: M3 すきま穴1 ×2
    with Locations(*[(-i * HOLE_WIZARD_M3_1_AT_4_PITCH, 0, 0) for i in range(1, HOLE_WIZARD_M3_1_AT_4_COUNT)]):
        add(hole_wizard_m3_1)


with BuildPart() as part_4:
    add(part_3.part)

    # M3 すきま穴1 at 4: cut by hole_wizard_m3_1_at_4_tool
    add(hole_wizard_m3_1_at_4_tool.part, mode=Mode.SUBTRACT)


with BuildPart() as pattern_linear_1_3_5:
    add(pattern_linear_1_3_4.part)

    # M3 すきま穴1 at 4: cut by hole_wizard_m3_1_at_4_tool
    add(hole_wizard_m3_1_at_4_tool.part, mode=Mode.SUBTRACT)


with BuildPart() as body_7:
    # ｽｹｯﾁ4 → ﾎﾞｽ - 押し出し2 (new body)
    with BuildSketch(Plane.XY.offset(5.5)):
        with Locations((9.5, 9.5)):
            Circle(SKETCH_4_R)
        with Locations((9.5, 9.5)):
            Circle(SKETCH_4_R_2, mode=Mode.SUBTRACT)
    extrude(amount=EXTRUDE_2_DEPTH)


with BuildPart() as body_8:
    # ｽｹｯﾁ4 → Extrude 2 2 (new body)
    with BuildSketch(Plane.XY.offset(5.5)):
        with Locations((9.5, -9.5)):
            Circle(SKETCH_4_R)
        with Locations((9.5, -9.5)):
            Circle(SKETCH_4_R_2, mode=Mode.SUBTRACT)
    extrude(amount=EXTRUDE_2_2_DEPTH)


with BuildPart() as body_9:
    # ｽｹｯﾁ4 → Extrude 2 3 (new body)
    with BuildSketch(Plane.XY.offset(5.5)):
        with Locations((-9.5, -9.5)):
            Circle(SKETCH_4_R)
        with Locations((-9.5, -9.5)):
            Circle(SKETCH_4_R_2, mode=Mode.SUBTRACT)
    extrude(amount=EXTRUDE_2_3_DEPTH)


with BuildPart() as body_10:
    # ｽｹｯﾁ4 → Extrude 2 4 (new body)
    with BuildSketch(Plane.XY.offset(5.5)):
        with Locations((-9.5, 9.5)):
            Circle(SKETCH_4_R)
        with Locations((-9.5, 9.5)):
            Circle(SKETCH_4_R_2, mode=Mode.SUBTRACT)
    extrude(amount=EXTRUDE_2_4_DEPTH)


solid = Compound([body_2.part, body_3.part, pattern_linear_1_1_1.part, pattern_linear_1_2_1.part, part_4.part, pattern_linear_1_3_5.part, body_7.part, body_8.part, body_9.part, body_10.part])
